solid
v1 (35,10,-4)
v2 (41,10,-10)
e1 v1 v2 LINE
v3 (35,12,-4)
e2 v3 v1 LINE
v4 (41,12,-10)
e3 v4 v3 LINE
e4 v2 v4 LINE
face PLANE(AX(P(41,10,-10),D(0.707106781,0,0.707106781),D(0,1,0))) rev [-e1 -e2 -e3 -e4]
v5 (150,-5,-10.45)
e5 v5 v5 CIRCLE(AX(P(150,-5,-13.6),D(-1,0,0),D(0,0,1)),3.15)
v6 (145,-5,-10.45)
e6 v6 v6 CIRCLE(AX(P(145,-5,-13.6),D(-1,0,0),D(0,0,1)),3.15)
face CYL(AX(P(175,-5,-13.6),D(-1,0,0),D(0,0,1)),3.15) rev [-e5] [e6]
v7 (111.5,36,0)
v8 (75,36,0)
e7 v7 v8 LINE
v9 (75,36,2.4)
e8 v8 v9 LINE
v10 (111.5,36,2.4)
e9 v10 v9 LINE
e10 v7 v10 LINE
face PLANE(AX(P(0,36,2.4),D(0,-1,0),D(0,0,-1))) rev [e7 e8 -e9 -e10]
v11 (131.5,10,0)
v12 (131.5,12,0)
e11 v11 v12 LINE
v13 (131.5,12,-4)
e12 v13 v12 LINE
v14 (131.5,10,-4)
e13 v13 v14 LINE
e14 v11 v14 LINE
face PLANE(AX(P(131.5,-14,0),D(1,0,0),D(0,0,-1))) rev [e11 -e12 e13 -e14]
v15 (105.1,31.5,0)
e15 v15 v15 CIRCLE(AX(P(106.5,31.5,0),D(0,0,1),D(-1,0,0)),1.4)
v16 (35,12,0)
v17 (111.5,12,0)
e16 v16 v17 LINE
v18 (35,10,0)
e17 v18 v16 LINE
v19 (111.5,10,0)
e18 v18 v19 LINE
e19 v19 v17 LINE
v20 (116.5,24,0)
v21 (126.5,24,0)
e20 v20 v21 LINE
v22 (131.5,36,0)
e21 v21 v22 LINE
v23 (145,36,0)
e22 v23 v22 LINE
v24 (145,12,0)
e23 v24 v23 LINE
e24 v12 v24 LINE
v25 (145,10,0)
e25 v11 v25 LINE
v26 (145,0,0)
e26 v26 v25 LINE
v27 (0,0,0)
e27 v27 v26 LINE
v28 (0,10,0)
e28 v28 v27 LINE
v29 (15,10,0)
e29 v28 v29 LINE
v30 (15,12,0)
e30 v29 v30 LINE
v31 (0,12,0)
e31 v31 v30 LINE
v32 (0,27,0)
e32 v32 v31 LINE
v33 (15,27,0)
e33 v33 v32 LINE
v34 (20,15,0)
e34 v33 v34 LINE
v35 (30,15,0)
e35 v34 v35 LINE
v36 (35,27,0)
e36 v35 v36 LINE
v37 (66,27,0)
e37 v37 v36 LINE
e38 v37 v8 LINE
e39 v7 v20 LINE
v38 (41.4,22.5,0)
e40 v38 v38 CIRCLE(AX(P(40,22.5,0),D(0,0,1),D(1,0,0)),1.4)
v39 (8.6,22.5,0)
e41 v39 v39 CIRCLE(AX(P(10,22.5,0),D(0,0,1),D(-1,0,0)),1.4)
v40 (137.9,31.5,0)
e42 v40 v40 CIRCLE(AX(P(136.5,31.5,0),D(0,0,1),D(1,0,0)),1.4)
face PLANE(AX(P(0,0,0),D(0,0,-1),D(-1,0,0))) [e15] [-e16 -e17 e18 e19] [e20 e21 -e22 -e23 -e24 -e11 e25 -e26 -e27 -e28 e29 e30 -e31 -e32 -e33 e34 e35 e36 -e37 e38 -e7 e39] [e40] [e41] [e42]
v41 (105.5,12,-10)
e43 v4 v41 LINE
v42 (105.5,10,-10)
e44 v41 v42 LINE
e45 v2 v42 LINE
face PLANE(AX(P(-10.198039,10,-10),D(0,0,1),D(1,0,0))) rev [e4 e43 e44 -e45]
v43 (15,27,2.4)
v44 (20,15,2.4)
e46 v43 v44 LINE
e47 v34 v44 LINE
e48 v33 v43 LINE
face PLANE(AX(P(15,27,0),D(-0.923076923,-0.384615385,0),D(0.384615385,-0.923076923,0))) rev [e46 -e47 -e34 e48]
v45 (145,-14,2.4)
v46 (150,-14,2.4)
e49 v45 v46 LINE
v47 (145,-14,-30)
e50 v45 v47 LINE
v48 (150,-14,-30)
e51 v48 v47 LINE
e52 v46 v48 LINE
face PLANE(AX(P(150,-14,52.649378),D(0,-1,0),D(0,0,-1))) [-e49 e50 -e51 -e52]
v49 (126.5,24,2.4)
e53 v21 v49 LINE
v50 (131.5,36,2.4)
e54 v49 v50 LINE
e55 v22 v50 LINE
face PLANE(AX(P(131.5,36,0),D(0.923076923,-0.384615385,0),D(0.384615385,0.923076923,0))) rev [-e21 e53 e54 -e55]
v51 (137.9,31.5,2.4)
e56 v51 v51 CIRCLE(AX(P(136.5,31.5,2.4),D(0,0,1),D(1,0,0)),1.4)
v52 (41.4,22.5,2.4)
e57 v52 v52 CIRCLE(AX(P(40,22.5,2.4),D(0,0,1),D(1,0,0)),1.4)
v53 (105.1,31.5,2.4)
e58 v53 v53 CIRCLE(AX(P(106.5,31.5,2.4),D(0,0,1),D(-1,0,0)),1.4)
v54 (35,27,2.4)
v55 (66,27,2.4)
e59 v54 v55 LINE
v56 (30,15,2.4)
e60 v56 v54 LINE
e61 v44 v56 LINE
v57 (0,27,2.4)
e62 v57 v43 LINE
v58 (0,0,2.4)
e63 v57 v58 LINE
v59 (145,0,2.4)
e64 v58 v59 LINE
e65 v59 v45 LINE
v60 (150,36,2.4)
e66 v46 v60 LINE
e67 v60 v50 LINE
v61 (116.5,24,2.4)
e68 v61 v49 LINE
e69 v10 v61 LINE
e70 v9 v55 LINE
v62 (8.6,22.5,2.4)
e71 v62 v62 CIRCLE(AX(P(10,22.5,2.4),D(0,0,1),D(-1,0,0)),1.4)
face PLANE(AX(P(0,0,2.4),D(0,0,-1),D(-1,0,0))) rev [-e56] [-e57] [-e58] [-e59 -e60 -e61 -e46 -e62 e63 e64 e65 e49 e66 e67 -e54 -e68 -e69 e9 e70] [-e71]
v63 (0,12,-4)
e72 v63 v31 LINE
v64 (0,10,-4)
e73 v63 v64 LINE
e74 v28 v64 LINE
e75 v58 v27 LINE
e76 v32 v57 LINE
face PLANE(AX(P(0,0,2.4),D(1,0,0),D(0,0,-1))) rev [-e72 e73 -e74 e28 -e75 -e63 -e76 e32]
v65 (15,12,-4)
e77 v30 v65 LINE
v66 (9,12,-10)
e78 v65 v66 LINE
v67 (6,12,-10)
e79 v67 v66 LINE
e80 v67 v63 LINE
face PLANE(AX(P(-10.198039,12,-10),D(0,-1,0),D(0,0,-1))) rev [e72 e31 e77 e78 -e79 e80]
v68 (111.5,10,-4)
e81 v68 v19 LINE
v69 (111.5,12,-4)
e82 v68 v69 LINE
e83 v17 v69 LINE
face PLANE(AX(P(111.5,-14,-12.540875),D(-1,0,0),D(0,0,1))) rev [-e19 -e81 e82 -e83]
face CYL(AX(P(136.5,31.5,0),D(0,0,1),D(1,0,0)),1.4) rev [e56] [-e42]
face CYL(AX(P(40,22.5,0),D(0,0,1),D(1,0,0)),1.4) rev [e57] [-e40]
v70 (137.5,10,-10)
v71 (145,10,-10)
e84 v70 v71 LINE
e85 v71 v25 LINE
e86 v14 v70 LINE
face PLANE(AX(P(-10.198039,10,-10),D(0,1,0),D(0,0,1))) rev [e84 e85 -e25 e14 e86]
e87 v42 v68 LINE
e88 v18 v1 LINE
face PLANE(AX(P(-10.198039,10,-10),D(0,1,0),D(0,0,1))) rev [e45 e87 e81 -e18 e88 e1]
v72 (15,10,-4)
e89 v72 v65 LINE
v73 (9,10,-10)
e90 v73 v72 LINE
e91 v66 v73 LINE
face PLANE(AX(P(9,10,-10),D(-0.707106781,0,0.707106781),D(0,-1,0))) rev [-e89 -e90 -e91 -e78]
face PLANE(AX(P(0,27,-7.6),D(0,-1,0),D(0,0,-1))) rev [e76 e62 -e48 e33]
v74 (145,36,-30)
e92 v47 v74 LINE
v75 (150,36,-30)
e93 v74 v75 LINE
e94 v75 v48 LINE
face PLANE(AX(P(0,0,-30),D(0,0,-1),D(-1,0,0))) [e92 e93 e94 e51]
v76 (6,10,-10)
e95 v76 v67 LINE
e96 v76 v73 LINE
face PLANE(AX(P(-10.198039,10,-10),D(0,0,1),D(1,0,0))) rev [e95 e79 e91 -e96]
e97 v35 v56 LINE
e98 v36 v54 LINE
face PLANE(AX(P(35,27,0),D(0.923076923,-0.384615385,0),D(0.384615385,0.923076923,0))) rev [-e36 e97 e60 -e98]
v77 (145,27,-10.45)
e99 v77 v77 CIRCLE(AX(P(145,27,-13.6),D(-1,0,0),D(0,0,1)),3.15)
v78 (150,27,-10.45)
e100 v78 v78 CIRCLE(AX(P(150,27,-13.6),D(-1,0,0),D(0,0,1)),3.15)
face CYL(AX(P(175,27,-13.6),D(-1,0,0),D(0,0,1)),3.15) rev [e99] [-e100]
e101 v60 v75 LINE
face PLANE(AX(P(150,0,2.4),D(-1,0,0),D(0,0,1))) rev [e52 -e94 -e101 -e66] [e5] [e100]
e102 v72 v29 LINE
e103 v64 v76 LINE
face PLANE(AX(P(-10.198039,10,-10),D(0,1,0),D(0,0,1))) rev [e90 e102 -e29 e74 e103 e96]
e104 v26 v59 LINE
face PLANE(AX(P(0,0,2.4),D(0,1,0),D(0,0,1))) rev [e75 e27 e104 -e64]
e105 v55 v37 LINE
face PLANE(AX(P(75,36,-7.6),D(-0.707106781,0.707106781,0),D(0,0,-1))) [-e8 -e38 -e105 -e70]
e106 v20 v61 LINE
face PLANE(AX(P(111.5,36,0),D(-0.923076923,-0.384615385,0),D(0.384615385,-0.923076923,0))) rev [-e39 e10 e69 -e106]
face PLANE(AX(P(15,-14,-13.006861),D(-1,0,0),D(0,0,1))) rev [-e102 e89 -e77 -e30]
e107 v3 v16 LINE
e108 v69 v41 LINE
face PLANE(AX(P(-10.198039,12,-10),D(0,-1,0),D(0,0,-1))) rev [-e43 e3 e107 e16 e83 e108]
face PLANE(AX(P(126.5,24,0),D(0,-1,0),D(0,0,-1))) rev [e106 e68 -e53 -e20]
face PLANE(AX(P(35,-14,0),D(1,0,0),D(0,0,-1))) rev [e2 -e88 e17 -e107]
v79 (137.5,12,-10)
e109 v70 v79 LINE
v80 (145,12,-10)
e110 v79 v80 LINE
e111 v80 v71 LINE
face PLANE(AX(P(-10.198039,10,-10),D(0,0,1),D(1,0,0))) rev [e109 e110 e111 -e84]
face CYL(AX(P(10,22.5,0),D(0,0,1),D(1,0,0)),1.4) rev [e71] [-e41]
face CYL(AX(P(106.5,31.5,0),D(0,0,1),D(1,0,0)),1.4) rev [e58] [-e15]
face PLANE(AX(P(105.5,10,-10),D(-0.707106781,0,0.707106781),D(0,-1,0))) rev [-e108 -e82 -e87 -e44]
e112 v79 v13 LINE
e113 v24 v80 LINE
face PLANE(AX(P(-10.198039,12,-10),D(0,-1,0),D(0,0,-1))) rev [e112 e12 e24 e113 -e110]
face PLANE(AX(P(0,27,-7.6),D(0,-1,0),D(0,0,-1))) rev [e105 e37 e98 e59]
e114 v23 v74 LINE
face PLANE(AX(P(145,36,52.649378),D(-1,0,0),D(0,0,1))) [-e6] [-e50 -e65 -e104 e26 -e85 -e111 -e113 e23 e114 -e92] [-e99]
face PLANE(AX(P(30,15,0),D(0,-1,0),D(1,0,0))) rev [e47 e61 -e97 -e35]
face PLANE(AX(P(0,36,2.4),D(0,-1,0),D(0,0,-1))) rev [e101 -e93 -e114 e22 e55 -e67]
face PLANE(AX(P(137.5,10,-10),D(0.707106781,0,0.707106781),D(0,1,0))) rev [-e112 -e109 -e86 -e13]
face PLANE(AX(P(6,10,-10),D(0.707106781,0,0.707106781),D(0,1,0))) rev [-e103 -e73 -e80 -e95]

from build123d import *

# Parameters (mm, degrees)
SKETCH1_W                       = 150
SKETCH1_H                       = 36
BOSS_EXTRUDE1_DEPTH             = 2.4
SKETCH10_W                      = 75
SKETCH10_H                      = 9
CUT_EXTRUDE5_DEPTH              = 10
SKETCH2_R                       = 1.4
CUT_EXTRUDE1_DEPTH              = 155.278190293
CHAMFER6_SIZE                   = 9
SKETCH3_W                       = 5
SKETCH3_H                       = 50
BOSS_EXTRUDE2_DEPTH             = 30
BOSS_EXTRUDE2_DIRECTION_2_REACH = 156.278
SKETCH4_R                       = 3.15
CUT_EXTRUDE2_DEPTH              = 30
SKETCH8_W                       = 10
SKETCH8_H                       = 2
BOSS_EXTRUDE4_DEPTH             = 145
SKETCH9_W                       = 20
SKETCH9_H                       = 12.540874848
SKETCH9_H_2                     = 13.006860614
CUT_EXTRUDE4_DEPTH              = 161.934769394
CHAMFER5_SIZE                   = 6


with BuildPart() as part:
    # Sketch1 → Boss-Extrude1 (new body)
    with BuildSketch(Plane.XY):
        with Locations((75, 18)):
            Rectangle(SKETCH1_W, SKETCH1_H)
    extrude(amount=BOSS_EXTRUDE1_DEPTH)

    # Sketch10 → Cut-Extrude5 (cut)
    with BuildSketch(Plane.XY.offset(2.4)):
        with Locations((37.5, 31.5)):
            Rectangle(SKETCH10_W, SKETCH10_H)
    extrude(amount=-CUT_EXTRUDE5_DEPTH, mode=Mode.SUBTRACT)

    # Sketch2 → Cut-Extrude1 (cut, through all)
    with BuildSketch(Plane.XY.offset(2.4)):
        with Locations((40, 22.5)):
            Circle(SKETCH2_R)
        with Locations(Location((10, 22.5, 0), (0, 0, 180))):
            Circle(SKETCH2_R)
        with Locations(Location((106.5, 31.5, 0), (0, 0, 180))):
            Circle(SKETCH2_R)
        with Locations((136.5, 31.5)):
            Circle(SKETCH2_R)
        Polygon((131.5, 36), (126.5, 24), (116.5, 24), (111.5, 36), align=None)
        Polygon((35, 27), (30, 15), (20, 15), (15, 27), align=None)
    extrude(amount=-CUT_EXTRUDE1_DEPTH, mode=Mode.SUBTRACT)

    # Chamfer6
    chamfer6_edges = [part.edges().sort_by_distance(p)[0] for p in [
        (75, 27, 1.2),
    ]]
    chamfer(chamfer6_edges, length=CHAMFER6_SIZE - 0.0001)  # a hair under: the kernel refuses the full size

    # Sketch3 → Boss-Extrude2 (add)
    with BuildSketch(Plane(origin=(0, 0, 0), x_dir=(-1, 0, 0), z_dir=(0, 0, -1))):
        with Locations((-147.5, 11)):
            Rectangle(SKETCH3_W, SKETCH3_H)
    extrude(amount=BOSS_EXTRUDE2_DEPTH)

    # Boss-Extrude2 direction 2: up to this face of the body (flat: up to its plane)
    boss_extrude2_direction_2_end = Plane(part.part.faces().sort_by_distance((80.903875834, 15.309167909, 2.4))[0])
    # Sketch3 → Boss-Extrude2 direction 2 (add, up to the picked face)
    with BuildSketch(Plane(origin=(0, 0, 0), x_dir=(-1, 0, 0), z_dir=(0, 0, -1)), mode=Mode.PRIVATE) as boss_extrude2_direction_2_sk1:
        with Locations((-147.5, 11)):
            Rectangle(SKETCH3_W, SKETCH3_H)
    boss_extrude2_direction_2_tool1 = split(extrude(boss_extrude2_direction_2_sk1.sketch, amount=-BOSS_EXTRUDE2_DIRECTION_2_REACH, mode=Mode.PRIVATE), bisect_by=boss_extrude2_direction_2_end, keep=Keep.BOTH, mode=Mode.PRIVATE)
    add(boss_extrude2_direction_2_tool1.solids().sort_by(Axis((147.5, 11, 0), (0, 0, 1)))[0])

    # Sketch4 → Cut-Extrude2 (cut)
    with BuildSketch(Plane.ZY.offset(-145)):
        with Locations((-13.6, 27)):
            Circle(SKETCH4_R)
        with Locations((-13.6, -5)):
            Circle(SKETCH4_R)
    extrude(amount=-CUT_EXTRUDE2_DEPTH, mode=Mode.SUBTRACT)

    # Sketch8 → Boss-Extrude4 (add)
    with BuildSketch(Plane.ZY.offset(-145)):
        with Locations((-5, 11)):
            Rectangle(SKETCH8_W, SKETCH8_H)
    extrude(amount=BOSS_EXTRUDE4_DEPTH)

    # Sketch9 → Cut-Extrude4 (cut, through all)
    with BuildSketch(Plane(origin=(0, 36, 0), x_dir=(1, 0, 0), z_dir=(0, 1, 0))):
        with Locations((121.5, 6.270437424)):
            Rectangle(SKETCH9_W, SKETCH9_H)
        with Locations((25, 6.503430307)):
            Rectangle(SKETCH9_W, SKETCH9_H_2)
    extrude(amount=-CUT_EXTRUDE4_DEPTH, mode=Mode.SUBTRACT)

    # Chamfer5
    chamfer5_edges = [part.edges().sort_by_distance(p)[0] for p in [
        (0, 11, -10),
        (111.5, 11, -10),
        (131.5, 11, -10),
        (15, 11, -10),
        (35, 11, -10),
    ]]
    chamfer(chamfer5_edges, length=CHAMFER5_SIZE)


solid = part.part
